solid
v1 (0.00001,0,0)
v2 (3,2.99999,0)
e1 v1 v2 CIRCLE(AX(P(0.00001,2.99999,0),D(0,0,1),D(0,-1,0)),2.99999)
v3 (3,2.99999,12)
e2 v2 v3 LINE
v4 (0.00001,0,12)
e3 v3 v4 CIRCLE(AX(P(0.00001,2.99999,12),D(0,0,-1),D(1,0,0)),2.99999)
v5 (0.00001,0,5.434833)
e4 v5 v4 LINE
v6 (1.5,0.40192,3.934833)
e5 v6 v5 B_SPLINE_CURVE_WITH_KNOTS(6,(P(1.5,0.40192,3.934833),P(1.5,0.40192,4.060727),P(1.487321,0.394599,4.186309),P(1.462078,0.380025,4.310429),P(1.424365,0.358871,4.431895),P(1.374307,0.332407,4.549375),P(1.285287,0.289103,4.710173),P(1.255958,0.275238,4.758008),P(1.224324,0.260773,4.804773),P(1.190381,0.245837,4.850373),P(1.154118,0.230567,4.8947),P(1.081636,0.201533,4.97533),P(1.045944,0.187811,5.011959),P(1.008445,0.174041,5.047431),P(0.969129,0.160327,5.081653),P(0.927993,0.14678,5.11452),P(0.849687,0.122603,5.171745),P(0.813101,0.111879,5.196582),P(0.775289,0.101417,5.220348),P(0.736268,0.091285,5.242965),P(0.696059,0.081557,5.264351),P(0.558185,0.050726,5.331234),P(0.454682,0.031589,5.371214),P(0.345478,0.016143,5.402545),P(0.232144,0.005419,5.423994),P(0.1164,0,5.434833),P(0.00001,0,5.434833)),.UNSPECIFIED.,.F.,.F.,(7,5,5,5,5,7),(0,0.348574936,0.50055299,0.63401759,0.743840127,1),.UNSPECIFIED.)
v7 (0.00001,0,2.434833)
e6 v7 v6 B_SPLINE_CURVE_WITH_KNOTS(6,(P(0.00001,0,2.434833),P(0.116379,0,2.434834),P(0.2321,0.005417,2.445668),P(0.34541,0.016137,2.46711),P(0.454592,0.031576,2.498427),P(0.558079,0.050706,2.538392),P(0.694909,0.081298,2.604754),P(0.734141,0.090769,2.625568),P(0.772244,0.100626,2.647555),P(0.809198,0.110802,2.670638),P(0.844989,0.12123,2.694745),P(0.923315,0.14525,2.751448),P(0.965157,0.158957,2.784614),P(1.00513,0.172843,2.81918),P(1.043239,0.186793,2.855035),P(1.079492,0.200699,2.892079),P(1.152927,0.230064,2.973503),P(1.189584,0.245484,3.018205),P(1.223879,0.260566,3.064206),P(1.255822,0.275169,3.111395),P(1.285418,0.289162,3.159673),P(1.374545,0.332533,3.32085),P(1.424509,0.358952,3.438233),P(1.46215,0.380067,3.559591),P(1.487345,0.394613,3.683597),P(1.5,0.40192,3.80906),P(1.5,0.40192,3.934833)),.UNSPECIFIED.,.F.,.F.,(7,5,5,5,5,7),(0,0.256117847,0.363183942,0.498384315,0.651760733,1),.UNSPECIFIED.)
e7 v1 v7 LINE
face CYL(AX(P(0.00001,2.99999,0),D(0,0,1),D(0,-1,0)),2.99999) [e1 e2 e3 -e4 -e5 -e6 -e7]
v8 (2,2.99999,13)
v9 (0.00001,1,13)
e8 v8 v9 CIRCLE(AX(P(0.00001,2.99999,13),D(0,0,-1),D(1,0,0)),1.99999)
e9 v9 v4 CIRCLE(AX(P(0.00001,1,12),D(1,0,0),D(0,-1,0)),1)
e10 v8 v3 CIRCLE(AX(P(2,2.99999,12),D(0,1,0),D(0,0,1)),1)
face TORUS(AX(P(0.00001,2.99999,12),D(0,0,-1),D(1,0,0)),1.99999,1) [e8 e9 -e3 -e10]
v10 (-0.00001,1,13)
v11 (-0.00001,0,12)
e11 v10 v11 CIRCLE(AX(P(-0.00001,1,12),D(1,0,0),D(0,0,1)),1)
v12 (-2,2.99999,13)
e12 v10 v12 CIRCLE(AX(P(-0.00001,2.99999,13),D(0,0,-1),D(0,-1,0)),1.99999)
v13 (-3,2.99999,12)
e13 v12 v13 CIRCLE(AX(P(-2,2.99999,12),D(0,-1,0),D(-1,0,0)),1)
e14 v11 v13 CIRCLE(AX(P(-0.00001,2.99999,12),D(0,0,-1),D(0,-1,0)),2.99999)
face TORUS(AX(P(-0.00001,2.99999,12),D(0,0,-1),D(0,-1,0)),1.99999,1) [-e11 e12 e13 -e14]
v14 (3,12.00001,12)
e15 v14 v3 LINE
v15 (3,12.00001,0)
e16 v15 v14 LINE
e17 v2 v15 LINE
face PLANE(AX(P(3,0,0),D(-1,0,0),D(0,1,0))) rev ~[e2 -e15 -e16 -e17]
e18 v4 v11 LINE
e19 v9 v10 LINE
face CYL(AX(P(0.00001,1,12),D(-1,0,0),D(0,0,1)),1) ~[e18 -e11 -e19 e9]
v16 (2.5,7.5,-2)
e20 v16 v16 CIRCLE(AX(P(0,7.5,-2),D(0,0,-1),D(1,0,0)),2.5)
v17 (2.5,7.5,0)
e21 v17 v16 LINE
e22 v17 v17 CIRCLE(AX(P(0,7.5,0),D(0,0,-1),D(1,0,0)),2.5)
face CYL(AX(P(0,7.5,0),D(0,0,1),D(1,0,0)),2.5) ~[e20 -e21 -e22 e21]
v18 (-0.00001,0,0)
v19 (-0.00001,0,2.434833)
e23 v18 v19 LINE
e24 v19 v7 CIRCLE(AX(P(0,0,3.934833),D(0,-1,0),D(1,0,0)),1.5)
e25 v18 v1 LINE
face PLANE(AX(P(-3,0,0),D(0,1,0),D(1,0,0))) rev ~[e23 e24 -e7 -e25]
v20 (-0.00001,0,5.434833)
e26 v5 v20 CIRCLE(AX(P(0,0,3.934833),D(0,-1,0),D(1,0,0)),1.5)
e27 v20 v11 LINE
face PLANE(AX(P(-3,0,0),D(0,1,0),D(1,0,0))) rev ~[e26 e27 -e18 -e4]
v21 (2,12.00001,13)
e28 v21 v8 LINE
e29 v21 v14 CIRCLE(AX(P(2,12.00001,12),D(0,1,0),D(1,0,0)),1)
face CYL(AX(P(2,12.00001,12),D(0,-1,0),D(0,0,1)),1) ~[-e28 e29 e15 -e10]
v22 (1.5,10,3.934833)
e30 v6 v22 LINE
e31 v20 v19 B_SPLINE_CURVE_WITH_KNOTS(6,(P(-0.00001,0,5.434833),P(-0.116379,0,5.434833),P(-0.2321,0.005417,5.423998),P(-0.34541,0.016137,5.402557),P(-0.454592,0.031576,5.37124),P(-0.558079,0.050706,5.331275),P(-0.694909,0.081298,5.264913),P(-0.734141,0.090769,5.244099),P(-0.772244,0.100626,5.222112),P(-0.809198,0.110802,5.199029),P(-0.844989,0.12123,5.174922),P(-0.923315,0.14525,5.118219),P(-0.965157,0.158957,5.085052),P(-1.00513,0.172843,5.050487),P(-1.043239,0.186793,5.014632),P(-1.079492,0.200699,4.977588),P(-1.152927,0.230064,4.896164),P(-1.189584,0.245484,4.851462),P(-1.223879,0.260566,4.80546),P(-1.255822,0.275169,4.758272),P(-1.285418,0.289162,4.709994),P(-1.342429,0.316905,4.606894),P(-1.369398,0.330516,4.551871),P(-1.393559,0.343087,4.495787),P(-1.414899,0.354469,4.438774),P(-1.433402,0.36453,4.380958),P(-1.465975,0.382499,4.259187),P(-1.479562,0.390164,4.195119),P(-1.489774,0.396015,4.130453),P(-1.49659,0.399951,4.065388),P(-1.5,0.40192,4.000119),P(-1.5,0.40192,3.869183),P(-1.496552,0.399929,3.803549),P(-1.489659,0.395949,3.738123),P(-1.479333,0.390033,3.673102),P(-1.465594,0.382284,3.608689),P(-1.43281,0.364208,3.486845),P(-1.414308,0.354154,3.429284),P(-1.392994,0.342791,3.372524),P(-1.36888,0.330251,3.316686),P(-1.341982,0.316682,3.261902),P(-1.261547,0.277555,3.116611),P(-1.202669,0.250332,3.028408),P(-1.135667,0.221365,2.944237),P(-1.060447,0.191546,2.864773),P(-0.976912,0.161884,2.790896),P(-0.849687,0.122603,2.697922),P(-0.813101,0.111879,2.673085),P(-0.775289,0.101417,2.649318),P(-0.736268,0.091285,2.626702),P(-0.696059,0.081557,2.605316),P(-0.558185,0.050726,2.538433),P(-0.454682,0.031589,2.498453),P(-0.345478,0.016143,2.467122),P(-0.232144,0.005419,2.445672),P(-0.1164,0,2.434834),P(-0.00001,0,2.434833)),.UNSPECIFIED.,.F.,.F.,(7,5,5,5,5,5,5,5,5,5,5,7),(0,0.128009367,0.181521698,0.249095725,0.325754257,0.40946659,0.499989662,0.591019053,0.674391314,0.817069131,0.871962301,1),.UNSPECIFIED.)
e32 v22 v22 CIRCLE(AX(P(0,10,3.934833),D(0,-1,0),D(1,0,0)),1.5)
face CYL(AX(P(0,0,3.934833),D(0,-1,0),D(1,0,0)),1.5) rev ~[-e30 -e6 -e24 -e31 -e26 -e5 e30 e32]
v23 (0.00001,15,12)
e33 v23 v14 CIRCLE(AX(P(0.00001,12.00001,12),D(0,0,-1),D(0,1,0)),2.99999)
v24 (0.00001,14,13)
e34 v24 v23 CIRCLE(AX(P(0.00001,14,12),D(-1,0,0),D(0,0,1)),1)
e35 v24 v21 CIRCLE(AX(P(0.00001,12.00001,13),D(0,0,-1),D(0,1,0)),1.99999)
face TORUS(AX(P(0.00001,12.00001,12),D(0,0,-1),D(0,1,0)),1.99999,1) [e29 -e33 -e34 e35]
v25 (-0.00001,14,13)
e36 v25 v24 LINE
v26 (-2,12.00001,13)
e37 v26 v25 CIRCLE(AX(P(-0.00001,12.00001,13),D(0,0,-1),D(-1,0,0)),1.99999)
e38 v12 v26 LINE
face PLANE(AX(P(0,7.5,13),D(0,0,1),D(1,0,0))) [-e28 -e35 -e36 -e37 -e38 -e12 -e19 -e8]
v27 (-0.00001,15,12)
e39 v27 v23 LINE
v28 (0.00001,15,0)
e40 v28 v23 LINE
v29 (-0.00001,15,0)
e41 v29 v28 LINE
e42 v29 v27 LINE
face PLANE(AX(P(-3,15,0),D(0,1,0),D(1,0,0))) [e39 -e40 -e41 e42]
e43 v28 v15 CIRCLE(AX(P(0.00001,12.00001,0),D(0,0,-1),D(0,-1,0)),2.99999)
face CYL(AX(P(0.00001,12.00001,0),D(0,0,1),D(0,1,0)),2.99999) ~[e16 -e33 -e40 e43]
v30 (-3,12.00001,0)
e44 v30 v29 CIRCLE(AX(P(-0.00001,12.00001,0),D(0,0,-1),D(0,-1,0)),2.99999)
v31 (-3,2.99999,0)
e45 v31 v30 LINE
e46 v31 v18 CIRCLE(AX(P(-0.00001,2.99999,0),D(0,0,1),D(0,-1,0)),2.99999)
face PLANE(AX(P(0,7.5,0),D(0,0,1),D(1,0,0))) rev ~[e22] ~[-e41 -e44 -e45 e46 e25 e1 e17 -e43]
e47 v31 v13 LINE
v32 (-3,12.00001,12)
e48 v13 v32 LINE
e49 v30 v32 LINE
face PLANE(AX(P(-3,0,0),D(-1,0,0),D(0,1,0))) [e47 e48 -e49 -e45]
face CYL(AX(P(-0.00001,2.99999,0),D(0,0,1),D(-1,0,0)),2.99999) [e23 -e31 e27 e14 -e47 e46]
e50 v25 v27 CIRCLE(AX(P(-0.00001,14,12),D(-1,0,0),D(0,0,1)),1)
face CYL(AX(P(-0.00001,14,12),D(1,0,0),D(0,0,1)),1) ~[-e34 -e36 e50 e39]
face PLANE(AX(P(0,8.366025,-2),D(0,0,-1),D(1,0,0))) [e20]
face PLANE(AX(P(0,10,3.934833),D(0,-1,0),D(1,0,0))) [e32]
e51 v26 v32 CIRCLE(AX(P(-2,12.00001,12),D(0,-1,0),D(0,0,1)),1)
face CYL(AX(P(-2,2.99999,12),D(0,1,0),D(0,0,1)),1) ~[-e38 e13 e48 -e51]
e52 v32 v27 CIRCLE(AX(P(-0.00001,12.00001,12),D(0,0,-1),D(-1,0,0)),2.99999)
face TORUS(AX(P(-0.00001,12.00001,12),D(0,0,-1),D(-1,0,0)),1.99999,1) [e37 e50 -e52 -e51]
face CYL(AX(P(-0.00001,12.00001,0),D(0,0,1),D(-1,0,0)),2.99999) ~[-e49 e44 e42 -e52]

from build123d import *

# Parameters (mm, degrees)
F0_W     = 6
F0_H     = 15
F1_DEPTH = 13
F3_DEPTH = 2
F4_R     = 2.99999
F5_R     = 1
F6_R     = 1.5
F7_DEPTH = 10


# Not quite as in the source:
# - a fillet or chamfer is up to 0.001 mm smaller than in the source, because OpenCascade refuses the exact size


with BuildPart() as f1:
    # F0 (on Top) → F1 (new body)
    with BuildSketch(Plane.XY):
        with Locations((0, 7.5)):
            Rectangle(F0_W, F0_H)
    extrude(amount=F1_DEPTH)

    # F2 (on face) → F3 (join)
    with BuildSketch(Plane(origin=(0, 0, 0), x_dir=(1, 0, 0), z_dir=(0, 0, -1))):
        with BuildLine():
            ThreePointArc((-2.5, -7.5), (0, -10), (2.5, -7.5))
            Line((2.5, -7.5), (-2.5, -7.5))
        make_face()
        with BuildLine():
            Line((-2.5, -7.5), (2.5, -7.5))
            ThreePointArc((2.5, -7.5), (0, -5), (-2.5, -7.5))
        make_face()
    extrude(amount=F3_DEPTH)

    # F4 (radius 3 in the source; OpenCascade refuses exactly that, so slightly less here)
    f4_edges = [f1.edges().sort_by_distance(p)[0] for p in [
        (-3, 0, 6.5),
        (3, 0, 6.5),
        (3, 15, 6.5),
        (-3, 15, 6.5),
    ]]
    fillet(f4_edges, radius=F4_R)

    # F5
    f5_edges = [f1.edges().sort_by_distance(p)[0] for p in [
        (0, 15, 13),
        (2.121323, 14.121323, 13),
        (-2.121323, 14.121323, 13),
        (3, 7.5, 13),
        (-3, 7.5, 13),
        (2.121323, 0.878677, 13),
        (-2.121323, 0.878677, 13),
        (0, 0, 13),
    ]]
    fillet(f5_edges, radius=F5_R)

    # F6 (on Front) → F7 (cut)
    with BuildSketch(Plane.XZ):
        with Locations((0, 3.9348333655)):
            Circle(F6_R)
    extrude(amount=-F7_DEPTH, mode=Mode.SUBTRACT)


solid = f1.part
